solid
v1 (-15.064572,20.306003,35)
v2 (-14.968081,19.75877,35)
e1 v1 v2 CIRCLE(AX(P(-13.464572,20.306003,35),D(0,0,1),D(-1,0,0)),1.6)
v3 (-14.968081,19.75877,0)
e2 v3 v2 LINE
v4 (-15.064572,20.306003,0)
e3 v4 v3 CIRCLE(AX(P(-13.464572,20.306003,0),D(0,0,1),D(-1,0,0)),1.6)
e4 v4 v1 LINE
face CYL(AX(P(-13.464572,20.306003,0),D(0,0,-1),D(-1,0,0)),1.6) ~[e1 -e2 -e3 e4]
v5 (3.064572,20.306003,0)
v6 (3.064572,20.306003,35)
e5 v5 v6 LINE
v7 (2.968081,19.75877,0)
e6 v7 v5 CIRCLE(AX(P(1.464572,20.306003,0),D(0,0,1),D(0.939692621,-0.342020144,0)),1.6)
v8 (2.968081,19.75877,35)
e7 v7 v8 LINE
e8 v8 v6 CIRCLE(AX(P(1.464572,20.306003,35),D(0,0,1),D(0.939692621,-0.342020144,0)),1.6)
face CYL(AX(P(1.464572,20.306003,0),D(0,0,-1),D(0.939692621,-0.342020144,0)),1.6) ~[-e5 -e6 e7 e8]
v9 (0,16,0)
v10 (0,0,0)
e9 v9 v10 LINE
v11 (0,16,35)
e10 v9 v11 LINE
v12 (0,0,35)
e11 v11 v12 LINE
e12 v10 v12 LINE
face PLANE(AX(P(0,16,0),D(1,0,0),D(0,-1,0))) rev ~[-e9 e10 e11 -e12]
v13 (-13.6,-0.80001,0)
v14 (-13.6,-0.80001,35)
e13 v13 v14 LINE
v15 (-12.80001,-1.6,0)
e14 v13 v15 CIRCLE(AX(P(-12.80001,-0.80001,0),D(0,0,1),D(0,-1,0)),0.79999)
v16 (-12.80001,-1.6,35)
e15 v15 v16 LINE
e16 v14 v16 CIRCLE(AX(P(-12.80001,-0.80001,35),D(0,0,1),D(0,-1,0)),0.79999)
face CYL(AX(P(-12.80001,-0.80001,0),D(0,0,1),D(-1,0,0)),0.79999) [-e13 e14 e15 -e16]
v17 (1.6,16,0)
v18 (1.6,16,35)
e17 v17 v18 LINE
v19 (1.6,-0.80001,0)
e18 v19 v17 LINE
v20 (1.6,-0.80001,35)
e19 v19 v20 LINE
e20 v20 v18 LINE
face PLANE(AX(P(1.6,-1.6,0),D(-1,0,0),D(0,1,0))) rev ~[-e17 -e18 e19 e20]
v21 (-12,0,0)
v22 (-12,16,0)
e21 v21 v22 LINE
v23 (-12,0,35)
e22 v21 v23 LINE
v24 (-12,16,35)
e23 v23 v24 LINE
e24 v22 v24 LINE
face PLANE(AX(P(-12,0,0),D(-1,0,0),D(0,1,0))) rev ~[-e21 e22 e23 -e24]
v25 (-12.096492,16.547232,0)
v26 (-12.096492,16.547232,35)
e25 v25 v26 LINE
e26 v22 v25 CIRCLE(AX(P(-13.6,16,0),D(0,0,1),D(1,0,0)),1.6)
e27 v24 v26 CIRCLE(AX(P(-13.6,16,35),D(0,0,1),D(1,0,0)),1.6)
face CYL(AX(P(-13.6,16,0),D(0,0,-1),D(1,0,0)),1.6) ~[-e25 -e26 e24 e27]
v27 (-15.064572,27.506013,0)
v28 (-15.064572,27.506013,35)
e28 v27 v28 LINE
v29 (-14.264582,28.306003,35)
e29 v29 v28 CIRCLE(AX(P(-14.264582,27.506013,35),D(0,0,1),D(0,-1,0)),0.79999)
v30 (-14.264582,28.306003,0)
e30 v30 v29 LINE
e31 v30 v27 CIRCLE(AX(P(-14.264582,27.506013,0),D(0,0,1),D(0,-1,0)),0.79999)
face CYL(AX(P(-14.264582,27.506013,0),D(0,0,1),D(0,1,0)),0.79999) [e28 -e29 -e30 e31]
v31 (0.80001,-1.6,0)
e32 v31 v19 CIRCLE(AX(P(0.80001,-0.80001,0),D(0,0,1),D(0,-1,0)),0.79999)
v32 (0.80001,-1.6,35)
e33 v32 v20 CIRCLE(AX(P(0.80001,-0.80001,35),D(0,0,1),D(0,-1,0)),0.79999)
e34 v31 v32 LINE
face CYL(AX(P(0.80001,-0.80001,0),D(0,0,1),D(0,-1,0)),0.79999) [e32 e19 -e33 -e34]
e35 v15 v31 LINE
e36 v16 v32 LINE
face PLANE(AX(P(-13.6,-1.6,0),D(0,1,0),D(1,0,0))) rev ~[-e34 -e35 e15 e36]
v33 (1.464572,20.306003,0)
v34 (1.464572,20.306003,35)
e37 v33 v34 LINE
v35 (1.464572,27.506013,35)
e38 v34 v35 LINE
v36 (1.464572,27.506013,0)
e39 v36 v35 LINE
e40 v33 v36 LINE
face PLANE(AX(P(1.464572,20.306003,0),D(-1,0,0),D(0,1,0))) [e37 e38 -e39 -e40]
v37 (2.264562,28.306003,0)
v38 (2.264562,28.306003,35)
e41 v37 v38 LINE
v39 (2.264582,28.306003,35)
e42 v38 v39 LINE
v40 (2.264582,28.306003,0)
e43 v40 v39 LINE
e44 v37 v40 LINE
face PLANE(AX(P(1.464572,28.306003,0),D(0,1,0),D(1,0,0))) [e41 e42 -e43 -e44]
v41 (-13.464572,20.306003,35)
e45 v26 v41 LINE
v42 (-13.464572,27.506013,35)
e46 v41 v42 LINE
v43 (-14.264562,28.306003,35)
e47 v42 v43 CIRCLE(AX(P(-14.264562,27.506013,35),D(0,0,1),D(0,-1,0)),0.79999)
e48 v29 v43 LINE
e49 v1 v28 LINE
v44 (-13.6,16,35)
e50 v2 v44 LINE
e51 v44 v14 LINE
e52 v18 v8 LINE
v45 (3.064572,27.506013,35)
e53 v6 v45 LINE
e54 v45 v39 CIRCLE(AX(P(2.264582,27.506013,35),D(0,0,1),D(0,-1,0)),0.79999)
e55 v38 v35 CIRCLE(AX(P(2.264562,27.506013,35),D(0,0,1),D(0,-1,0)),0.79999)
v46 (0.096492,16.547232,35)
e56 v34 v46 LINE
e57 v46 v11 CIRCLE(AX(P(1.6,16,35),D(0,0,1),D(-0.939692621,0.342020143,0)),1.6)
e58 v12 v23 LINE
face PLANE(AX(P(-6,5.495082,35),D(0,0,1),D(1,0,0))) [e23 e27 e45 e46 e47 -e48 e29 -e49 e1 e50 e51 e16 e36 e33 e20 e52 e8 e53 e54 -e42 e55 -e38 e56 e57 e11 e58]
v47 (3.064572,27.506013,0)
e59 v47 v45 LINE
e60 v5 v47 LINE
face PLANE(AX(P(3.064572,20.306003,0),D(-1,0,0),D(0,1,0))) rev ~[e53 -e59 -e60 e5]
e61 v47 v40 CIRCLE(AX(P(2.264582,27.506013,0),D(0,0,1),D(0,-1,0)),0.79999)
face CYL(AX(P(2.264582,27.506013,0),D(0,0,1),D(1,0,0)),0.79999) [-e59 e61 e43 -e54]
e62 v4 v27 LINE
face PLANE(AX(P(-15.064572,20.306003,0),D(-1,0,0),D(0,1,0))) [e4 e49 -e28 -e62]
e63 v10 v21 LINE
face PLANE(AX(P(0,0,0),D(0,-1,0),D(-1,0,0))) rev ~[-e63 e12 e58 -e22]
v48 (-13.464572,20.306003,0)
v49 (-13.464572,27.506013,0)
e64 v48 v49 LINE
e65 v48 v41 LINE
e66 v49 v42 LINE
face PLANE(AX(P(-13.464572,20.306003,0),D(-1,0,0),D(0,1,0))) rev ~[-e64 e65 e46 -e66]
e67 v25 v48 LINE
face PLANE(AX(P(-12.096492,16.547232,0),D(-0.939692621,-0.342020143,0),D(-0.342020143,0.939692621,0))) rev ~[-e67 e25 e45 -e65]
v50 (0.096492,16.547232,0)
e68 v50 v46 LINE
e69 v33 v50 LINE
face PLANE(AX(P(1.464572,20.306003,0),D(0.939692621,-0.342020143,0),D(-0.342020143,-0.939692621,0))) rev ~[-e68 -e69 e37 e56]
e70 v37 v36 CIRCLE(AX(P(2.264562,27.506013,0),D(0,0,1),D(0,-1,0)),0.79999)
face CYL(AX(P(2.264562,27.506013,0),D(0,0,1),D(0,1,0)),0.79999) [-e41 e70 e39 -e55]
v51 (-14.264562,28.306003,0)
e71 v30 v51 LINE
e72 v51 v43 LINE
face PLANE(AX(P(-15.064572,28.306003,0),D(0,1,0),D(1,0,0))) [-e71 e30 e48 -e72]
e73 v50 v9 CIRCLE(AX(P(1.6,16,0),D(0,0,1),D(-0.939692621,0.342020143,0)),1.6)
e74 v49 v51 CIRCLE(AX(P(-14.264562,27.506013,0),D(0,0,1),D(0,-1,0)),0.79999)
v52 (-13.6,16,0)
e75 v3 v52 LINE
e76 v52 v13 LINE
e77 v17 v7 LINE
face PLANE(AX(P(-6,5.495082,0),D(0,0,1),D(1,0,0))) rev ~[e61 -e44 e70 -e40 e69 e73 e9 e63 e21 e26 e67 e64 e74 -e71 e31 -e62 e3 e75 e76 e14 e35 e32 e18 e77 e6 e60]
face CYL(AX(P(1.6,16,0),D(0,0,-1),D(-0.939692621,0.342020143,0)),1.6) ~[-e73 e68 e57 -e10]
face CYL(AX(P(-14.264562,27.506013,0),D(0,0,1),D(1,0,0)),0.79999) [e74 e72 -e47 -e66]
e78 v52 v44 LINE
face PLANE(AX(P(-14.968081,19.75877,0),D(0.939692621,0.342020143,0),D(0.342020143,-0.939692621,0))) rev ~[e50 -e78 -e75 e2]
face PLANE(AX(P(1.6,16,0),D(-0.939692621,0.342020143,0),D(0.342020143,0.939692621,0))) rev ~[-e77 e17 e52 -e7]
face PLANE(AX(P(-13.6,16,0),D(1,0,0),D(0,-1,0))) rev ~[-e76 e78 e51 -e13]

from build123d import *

# Parameters (mm, degrees)
F0_W     = 1.6
F0_H     = 8
F1_DEPTH = 35
F2_R     = 0.79999


# Not quite as in the source:
# - a fillet or chamfer is up to 0.001 mm smaller than in the source, because OpenCascade refuses the exact size


with BuildPart() as f1:
    # F0 (on Top) → F1 (new body)
    with BuildSketch(Plane.XY):
        Polygon((0, 16), (0, 0), (-12, 0), (-12, 16), (-13.6, 16), (-13.6, -1.6), (1.6, -1.6), (1.6, 16), align=None)
        with BuildLine():
            ThreePointArc((0.0964918067, 16.5472322293), (0.0243075952, 16.2778370843), (0, 16))
            Line((0, 16), (1.6, 16))
            Line((1.6, 16), (0.0964918067, 16.5472322293))
        make_face()
        with BuildLine():
            Line((-13.6, 16), (-12, 16))
            ThreePointArc((-12, 16), (-12.0243075952, 16.2778370843), (-12.0964918067, 16.5472322293))
            Line((-12.0964918067, 16.5472322293), (-13.6, 16))
        make_face()
        Polygon((0.0964918067, 16.5472322293), (1.6, 16), (2.9680805733, 19.7587704831), (1.46457238, 20.3060027125), align=None)
        Polygon((-14.9680805733, 19.7587704831), (-13.6, 16), (-12.0964918067, 16.5472322293), (-13.46457238, 20.3060027125), align=None)
        with BuildLine():
            Line((1.46457238, 20.3060027125), (2.9680805733, 19.7587704831))
            ThreePointArc((2.9680805733, 19.7587704831), (3.0402647849, 20.0281656282), (3.06457238, 20.3060027125))
            Line((3.06457238, 20.3060027125), (1.46457238, 20.3060027125))
        make_face()
        with Locations((2.26457238, 24.3060027125)):
            Rectangle(F0_W, F0_H)
        with BuildLine():
            ThreePointArc((-15.06457238, 20.3060027125), (-15.0402647849, 20.0281656282), (-14.9680805733, 19.7587704831))
            Line((-14.9680805733, 19.7587704831), (-13.46457238, 20.3060027125))
            Line((-13.46457238, 20.3060027125), (-15.06457238, 20.3060027125))
        make_face()
        with Locations((-14.26457238, 24.3060027125)):
            Rectangle(F0_W, F0_H)
    extrude(amount=F1_DEPTH)

    # F2 (radius 0.8 in the source; OpenCascade refuses exactly that, so slightly less here)
    f2_edges = [f1.edges().sort_by_distance(p)[0] for p in [
        (1.6, -1.6, 17.5),
        (-13.6, -1.6, 17.5),
        (-15.064572, 28.306003, 17.5),
        (3.064572, 28.306003, 17.5),
        (1.464572, 28.306003, 17.5),
        (-13.464572, 28.306003, 17.5),
    ]]
    fillet(f2_edges, radius=F2_R)


solid = f1.part
